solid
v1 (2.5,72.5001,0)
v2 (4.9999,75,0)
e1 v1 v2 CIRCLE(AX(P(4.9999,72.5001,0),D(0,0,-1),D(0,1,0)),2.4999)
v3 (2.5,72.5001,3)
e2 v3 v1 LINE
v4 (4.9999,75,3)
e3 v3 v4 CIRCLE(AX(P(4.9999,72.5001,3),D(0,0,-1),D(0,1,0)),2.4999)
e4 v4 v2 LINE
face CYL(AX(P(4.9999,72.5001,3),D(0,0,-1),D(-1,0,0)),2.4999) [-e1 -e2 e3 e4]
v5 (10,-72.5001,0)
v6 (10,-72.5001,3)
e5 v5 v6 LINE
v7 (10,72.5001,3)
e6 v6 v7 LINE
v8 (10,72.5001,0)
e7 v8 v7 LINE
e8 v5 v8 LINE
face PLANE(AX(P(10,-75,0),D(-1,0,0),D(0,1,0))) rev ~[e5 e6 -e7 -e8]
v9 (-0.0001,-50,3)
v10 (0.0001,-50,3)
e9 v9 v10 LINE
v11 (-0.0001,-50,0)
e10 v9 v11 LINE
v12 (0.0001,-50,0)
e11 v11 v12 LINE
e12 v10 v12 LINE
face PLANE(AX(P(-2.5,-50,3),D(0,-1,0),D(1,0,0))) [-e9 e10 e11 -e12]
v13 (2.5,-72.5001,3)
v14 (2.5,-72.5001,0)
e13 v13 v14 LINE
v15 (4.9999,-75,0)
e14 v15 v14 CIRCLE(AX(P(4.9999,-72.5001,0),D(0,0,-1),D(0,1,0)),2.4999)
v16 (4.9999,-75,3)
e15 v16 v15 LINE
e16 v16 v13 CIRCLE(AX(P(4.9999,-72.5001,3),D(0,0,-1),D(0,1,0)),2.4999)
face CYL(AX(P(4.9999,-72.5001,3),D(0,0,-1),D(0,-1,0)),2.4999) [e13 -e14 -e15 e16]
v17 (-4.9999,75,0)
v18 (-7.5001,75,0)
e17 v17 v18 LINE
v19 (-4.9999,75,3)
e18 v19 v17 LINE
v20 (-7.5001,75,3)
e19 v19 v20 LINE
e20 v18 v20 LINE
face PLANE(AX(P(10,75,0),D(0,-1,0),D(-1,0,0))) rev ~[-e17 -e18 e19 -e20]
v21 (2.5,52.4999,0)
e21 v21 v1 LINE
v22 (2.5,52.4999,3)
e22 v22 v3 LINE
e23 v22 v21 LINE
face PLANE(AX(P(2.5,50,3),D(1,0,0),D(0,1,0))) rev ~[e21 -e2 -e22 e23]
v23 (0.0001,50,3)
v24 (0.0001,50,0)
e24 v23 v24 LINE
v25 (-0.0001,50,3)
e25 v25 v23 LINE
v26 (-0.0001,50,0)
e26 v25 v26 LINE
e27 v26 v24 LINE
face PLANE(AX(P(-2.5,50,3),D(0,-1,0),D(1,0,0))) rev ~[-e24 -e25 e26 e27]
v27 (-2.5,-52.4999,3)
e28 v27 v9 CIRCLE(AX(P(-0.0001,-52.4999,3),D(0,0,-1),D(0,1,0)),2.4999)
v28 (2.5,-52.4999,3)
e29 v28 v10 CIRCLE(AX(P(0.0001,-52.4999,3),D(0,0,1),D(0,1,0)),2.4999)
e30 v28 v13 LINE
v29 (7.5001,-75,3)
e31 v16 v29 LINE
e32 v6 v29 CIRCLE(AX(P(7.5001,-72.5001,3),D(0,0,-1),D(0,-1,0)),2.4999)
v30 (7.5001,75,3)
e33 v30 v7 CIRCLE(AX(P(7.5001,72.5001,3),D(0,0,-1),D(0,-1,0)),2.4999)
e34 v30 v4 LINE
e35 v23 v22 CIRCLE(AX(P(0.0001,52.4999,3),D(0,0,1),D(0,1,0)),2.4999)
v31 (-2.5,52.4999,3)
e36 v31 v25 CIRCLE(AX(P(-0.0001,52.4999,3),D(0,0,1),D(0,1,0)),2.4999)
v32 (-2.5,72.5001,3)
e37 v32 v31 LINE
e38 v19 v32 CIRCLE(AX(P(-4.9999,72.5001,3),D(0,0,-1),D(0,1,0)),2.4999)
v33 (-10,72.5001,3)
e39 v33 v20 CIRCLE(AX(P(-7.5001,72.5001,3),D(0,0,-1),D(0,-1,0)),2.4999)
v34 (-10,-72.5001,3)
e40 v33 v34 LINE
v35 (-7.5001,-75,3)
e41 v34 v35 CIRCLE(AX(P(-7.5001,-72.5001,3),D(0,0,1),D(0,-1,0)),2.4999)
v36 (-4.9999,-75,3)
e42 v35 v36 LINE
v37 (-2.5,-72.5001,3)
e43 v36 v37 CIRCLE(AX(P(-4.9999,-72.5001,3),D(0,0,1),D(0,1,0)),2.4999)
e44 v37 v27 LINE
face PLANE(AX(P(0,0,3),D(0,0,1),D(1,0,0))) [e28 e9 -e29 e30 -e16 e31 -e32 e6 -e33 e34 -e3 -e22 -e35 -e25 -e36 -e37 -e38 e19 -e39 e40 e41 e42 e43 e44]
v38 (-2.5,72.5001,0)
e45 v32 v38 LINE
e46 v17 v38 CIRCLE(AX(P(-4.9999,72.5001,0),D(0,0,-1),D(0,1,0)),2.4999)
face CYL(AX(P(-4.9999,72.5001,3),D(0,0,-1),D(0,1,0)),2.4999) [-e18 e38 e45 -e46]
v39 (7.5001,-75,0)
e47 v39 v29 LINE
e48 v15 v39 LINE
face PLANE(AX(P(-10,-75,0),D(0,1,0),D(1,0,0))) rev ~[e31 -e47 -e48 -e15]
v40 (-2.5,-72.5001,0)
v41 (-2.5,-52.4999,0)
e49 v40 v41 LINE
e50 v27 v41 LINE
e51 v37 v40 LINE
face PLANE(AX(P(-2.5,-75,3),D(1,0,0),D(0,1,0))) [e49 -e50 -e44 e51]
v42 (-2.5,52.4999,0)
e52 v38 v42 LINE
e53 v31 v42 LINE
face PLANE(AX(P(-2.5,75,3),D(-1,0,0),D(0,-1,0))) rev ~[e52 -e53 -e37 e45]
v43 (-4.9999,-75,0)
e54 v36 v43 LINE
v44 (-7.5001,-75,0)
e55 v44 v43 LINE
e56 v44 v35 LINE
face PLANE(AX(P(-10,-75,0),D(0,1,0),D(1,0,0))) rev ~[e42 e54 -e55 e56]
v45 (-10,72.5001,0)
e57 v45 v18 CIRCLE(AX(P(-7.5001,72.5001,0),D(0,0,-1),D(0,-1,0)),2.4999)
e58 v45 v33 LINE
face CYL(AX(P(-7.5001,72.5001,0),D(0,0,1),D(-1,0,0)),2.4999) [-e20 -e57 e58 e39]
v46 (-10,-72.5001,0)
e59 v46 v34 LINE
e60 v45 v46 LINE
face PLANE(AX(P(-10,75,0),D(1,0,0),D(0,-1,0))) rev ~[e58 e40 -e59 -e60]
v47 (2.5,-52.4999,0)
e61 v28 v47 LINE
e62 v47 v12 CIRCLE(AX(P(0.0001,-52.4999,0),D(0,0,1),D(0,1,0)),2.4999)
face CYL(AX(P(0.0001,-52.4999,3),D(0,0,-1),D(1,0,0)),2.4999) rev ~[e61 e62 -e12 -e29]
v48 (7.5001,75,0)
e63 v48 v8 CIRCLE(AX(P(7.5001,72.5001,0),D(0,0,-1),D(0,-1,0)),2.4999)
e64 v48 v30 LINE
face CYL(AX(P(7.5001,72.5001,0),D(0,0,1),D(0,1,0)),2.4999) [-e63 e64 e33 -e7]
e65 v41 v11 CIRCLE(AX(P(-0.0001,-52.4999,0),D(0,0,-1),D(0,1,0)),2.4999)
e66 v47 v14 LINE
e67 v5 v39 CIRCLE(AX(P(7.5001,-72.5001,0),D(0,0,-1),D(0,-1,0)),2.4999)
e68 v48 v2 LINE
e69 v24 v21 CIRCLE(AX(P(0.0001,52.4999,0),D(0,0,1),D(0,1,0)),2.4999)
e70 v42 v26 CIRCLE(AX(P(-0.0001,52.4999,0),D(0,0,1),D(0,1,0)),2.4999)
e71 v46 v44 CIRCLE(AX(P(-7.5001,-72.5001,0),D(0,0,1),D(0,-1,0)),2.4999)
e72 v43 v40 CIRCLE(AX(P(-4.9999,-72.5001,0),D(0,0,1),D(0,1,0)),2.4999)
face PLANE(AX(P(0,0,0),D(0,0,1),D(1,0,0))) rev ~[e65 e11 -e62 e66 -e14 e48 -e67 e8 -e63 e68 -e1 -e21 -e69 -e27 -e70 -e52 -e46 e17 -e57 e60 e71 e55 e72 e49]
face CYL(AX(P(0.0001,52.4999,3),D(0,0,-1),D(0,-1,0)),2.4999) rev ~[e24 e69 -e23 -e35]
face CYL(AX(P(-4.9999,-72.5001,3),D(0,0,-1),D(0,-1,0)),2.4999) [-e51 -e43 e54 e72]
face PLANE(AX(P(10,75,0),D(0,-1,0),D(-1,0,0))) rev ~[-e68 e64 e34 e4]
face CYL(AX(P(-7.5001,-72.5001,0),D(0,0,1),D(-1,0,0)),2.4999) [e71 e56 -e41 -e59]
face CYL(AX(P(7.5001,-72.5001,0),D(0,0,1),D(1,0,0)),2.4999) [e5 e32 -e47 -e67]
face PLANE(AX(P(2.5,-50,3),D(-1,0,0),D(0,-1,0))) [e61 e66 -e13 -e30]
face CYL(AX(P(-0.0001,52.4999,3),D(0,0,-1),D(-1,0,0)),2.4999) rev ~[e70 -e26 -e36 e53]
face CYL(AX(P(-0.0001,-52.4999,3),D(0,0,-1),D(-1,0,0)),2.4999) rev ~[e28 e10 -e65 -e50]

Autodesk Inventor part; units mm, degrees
ref_plane "YZ Plane" through (0, 0, 0) normal (1, 0, 0) x (0, 1, 0)
ref_plane "XZ Plane" through (0, 0, 0) normal (0, 1, 0) x (-1, 0, 0)
ref_plane "XY Plane" through (0, 0, 0) normal (0, 0, 1) x (1, 0, 0)
sketch "Sketch1" plane through (0, 0, 0) normal (0, 0, 1) x (1, 0, 0)
  line L0 (-10, -75) -> (10, -75)
  line L1 (10, -75) -> (10, 75)
  line L2 (10, 75) -> (-10, 75)
  line L3 (-10, 75) -> (-10, -75)
  line L4 (-10, -75) -> (10, 75) construction
  line L5 (10, -75) -> (-10, 75) construction
  point P0 (0, 0)
  dimension "d0" = 20
  dimension "d1" = 150
extrude "Extrusion1" add sketch "Sketch1" along normal blind 3
sketch "Sketch2" plane through (0, 0, 3) normal (0, 0, 1) x (1, 0, 0)
  line L0 (0, -105) -> (0, 105) construction
  line L1 (-2.5, 50) -> (2.5, 50)
  line L2 (2.5, 50) -> (2.5, 75)
  line L3 (2.5, 75) -> (-2.5, 75)
  line L4 (-2.5, 75) -> (-2.5, 50)
  line L5 (-2.5, 50) -> (2.5, 75) construction
  line L6 (2.5, 50) -> (-2.5, 75) construction
  line L7 (10, 75) -> (-10, 75) construction
  line L8 (-14, 0) -> (14, 0) projected
  line L9 (-2.5, -50) -> (2.5, -50)
  line L10 (2.5, -50) -> (2.5, -75)
  line L11 (2.5, -75) -> (-2.5, -75)
  line L12 (-2.5, -75) -> (-2.5, -50)
  line L13 (-2.5, -50) -> (2.5, -75) construction
  line L14 (2.5, -50) -> (-2.5, -75) construction
  line L15 (10, -75) -> (-10, -75) construction
  point P0 (0, 0)
  point P1 (0, 62.5)
  point P2 (0, 75)
  point P3 (0, -62.5)
  point P4 (0, -75)
  dimension "d4" = 100
  dimension "d5" = 5
extrude "Extrusion2" cut sketch "Sketch2" against normal blind 3
fillet "Fillet1" radius 2.5 12 edges at (-2.5, 50, 1.5) (2.5, 50, 1.5) (-2.5, 75, 1.5) (2.5, 75, 1.5) (10, 75, 1.5) (-10, 75, 1.5) (10, -75, 1.5) (-10, -75, 1.5) (-2.5, -75, 1.5) (2.5, -75, 1.5) (-2.5, -50, 1.5) (2.5, -50, 1.5)
sketch "Sketch3" plane through (0, 0, 3) normal (0, 0, 1) x (1, 0, 0)
  arc A0 (2.5, -72.5) -> (5, -75) centre (5, -72.5) ccw projected
  line L0 (5, -75) -> (7.5, -75) projected
  arc A1 (7.5, -75) -> (10, -72.5) centre (7.5, -72.5) ccw projected
  line L1 (10, -72.5) -> (10, 72.5) projected
  arc A2 (10, 72.5) -> (7.5, 75) centre (7.5, 72.5) ccw projected
  line L2 (7.5, 75) -> (5, 75) projected
  arc A3 (5, 75) -> (2.5, 72.5) centre (5, 72.5) ccw projected
  line L3 (2.5, 72.5) -> (2.5, 52.5) projected
  arc A4 (-2.5, 52.5) -> (2.5, 52.5) centre (0, 52.5) ccw projected
  line L4 (-2.5, 52.5) -> (-2.5, 72.5) projected
  arc A5 (-2.5, 72.5) -> (-5, 75) centre (-5, 72.5) ccw projected
  line L5 (-5, 75) -> (-7.5, 75) projected
  arc A6 (-7.5, 75) -> (-10, 72.5) centre (-7.5, 72.5) ccw projected
  line L6 (-10, 72.5) -> (-10, -72.5) projected
  arc A7 (-10, -72.5) -> (-7.5, -75) centre (-7.5, -72.5) ccw projected
  line L7 (-7.5, -75) -> (-5, -75) projected
  arc A8 (-5, -75) -> (-2.5, -72.5) centre (-5, -72.5) ccw projected
  line L8 (-2.5, -72.5) -> (-2.5, -52.5) projected
  arc A9 (2.5, -52.5) -> (-2.5, -52.5) centre (0, -52.5) ccw projected
  line L9 (2.5, -52.5) -> (2.5, -72.5) projected
  point P0 (0, 0)
properties part number "LED_Glass"
